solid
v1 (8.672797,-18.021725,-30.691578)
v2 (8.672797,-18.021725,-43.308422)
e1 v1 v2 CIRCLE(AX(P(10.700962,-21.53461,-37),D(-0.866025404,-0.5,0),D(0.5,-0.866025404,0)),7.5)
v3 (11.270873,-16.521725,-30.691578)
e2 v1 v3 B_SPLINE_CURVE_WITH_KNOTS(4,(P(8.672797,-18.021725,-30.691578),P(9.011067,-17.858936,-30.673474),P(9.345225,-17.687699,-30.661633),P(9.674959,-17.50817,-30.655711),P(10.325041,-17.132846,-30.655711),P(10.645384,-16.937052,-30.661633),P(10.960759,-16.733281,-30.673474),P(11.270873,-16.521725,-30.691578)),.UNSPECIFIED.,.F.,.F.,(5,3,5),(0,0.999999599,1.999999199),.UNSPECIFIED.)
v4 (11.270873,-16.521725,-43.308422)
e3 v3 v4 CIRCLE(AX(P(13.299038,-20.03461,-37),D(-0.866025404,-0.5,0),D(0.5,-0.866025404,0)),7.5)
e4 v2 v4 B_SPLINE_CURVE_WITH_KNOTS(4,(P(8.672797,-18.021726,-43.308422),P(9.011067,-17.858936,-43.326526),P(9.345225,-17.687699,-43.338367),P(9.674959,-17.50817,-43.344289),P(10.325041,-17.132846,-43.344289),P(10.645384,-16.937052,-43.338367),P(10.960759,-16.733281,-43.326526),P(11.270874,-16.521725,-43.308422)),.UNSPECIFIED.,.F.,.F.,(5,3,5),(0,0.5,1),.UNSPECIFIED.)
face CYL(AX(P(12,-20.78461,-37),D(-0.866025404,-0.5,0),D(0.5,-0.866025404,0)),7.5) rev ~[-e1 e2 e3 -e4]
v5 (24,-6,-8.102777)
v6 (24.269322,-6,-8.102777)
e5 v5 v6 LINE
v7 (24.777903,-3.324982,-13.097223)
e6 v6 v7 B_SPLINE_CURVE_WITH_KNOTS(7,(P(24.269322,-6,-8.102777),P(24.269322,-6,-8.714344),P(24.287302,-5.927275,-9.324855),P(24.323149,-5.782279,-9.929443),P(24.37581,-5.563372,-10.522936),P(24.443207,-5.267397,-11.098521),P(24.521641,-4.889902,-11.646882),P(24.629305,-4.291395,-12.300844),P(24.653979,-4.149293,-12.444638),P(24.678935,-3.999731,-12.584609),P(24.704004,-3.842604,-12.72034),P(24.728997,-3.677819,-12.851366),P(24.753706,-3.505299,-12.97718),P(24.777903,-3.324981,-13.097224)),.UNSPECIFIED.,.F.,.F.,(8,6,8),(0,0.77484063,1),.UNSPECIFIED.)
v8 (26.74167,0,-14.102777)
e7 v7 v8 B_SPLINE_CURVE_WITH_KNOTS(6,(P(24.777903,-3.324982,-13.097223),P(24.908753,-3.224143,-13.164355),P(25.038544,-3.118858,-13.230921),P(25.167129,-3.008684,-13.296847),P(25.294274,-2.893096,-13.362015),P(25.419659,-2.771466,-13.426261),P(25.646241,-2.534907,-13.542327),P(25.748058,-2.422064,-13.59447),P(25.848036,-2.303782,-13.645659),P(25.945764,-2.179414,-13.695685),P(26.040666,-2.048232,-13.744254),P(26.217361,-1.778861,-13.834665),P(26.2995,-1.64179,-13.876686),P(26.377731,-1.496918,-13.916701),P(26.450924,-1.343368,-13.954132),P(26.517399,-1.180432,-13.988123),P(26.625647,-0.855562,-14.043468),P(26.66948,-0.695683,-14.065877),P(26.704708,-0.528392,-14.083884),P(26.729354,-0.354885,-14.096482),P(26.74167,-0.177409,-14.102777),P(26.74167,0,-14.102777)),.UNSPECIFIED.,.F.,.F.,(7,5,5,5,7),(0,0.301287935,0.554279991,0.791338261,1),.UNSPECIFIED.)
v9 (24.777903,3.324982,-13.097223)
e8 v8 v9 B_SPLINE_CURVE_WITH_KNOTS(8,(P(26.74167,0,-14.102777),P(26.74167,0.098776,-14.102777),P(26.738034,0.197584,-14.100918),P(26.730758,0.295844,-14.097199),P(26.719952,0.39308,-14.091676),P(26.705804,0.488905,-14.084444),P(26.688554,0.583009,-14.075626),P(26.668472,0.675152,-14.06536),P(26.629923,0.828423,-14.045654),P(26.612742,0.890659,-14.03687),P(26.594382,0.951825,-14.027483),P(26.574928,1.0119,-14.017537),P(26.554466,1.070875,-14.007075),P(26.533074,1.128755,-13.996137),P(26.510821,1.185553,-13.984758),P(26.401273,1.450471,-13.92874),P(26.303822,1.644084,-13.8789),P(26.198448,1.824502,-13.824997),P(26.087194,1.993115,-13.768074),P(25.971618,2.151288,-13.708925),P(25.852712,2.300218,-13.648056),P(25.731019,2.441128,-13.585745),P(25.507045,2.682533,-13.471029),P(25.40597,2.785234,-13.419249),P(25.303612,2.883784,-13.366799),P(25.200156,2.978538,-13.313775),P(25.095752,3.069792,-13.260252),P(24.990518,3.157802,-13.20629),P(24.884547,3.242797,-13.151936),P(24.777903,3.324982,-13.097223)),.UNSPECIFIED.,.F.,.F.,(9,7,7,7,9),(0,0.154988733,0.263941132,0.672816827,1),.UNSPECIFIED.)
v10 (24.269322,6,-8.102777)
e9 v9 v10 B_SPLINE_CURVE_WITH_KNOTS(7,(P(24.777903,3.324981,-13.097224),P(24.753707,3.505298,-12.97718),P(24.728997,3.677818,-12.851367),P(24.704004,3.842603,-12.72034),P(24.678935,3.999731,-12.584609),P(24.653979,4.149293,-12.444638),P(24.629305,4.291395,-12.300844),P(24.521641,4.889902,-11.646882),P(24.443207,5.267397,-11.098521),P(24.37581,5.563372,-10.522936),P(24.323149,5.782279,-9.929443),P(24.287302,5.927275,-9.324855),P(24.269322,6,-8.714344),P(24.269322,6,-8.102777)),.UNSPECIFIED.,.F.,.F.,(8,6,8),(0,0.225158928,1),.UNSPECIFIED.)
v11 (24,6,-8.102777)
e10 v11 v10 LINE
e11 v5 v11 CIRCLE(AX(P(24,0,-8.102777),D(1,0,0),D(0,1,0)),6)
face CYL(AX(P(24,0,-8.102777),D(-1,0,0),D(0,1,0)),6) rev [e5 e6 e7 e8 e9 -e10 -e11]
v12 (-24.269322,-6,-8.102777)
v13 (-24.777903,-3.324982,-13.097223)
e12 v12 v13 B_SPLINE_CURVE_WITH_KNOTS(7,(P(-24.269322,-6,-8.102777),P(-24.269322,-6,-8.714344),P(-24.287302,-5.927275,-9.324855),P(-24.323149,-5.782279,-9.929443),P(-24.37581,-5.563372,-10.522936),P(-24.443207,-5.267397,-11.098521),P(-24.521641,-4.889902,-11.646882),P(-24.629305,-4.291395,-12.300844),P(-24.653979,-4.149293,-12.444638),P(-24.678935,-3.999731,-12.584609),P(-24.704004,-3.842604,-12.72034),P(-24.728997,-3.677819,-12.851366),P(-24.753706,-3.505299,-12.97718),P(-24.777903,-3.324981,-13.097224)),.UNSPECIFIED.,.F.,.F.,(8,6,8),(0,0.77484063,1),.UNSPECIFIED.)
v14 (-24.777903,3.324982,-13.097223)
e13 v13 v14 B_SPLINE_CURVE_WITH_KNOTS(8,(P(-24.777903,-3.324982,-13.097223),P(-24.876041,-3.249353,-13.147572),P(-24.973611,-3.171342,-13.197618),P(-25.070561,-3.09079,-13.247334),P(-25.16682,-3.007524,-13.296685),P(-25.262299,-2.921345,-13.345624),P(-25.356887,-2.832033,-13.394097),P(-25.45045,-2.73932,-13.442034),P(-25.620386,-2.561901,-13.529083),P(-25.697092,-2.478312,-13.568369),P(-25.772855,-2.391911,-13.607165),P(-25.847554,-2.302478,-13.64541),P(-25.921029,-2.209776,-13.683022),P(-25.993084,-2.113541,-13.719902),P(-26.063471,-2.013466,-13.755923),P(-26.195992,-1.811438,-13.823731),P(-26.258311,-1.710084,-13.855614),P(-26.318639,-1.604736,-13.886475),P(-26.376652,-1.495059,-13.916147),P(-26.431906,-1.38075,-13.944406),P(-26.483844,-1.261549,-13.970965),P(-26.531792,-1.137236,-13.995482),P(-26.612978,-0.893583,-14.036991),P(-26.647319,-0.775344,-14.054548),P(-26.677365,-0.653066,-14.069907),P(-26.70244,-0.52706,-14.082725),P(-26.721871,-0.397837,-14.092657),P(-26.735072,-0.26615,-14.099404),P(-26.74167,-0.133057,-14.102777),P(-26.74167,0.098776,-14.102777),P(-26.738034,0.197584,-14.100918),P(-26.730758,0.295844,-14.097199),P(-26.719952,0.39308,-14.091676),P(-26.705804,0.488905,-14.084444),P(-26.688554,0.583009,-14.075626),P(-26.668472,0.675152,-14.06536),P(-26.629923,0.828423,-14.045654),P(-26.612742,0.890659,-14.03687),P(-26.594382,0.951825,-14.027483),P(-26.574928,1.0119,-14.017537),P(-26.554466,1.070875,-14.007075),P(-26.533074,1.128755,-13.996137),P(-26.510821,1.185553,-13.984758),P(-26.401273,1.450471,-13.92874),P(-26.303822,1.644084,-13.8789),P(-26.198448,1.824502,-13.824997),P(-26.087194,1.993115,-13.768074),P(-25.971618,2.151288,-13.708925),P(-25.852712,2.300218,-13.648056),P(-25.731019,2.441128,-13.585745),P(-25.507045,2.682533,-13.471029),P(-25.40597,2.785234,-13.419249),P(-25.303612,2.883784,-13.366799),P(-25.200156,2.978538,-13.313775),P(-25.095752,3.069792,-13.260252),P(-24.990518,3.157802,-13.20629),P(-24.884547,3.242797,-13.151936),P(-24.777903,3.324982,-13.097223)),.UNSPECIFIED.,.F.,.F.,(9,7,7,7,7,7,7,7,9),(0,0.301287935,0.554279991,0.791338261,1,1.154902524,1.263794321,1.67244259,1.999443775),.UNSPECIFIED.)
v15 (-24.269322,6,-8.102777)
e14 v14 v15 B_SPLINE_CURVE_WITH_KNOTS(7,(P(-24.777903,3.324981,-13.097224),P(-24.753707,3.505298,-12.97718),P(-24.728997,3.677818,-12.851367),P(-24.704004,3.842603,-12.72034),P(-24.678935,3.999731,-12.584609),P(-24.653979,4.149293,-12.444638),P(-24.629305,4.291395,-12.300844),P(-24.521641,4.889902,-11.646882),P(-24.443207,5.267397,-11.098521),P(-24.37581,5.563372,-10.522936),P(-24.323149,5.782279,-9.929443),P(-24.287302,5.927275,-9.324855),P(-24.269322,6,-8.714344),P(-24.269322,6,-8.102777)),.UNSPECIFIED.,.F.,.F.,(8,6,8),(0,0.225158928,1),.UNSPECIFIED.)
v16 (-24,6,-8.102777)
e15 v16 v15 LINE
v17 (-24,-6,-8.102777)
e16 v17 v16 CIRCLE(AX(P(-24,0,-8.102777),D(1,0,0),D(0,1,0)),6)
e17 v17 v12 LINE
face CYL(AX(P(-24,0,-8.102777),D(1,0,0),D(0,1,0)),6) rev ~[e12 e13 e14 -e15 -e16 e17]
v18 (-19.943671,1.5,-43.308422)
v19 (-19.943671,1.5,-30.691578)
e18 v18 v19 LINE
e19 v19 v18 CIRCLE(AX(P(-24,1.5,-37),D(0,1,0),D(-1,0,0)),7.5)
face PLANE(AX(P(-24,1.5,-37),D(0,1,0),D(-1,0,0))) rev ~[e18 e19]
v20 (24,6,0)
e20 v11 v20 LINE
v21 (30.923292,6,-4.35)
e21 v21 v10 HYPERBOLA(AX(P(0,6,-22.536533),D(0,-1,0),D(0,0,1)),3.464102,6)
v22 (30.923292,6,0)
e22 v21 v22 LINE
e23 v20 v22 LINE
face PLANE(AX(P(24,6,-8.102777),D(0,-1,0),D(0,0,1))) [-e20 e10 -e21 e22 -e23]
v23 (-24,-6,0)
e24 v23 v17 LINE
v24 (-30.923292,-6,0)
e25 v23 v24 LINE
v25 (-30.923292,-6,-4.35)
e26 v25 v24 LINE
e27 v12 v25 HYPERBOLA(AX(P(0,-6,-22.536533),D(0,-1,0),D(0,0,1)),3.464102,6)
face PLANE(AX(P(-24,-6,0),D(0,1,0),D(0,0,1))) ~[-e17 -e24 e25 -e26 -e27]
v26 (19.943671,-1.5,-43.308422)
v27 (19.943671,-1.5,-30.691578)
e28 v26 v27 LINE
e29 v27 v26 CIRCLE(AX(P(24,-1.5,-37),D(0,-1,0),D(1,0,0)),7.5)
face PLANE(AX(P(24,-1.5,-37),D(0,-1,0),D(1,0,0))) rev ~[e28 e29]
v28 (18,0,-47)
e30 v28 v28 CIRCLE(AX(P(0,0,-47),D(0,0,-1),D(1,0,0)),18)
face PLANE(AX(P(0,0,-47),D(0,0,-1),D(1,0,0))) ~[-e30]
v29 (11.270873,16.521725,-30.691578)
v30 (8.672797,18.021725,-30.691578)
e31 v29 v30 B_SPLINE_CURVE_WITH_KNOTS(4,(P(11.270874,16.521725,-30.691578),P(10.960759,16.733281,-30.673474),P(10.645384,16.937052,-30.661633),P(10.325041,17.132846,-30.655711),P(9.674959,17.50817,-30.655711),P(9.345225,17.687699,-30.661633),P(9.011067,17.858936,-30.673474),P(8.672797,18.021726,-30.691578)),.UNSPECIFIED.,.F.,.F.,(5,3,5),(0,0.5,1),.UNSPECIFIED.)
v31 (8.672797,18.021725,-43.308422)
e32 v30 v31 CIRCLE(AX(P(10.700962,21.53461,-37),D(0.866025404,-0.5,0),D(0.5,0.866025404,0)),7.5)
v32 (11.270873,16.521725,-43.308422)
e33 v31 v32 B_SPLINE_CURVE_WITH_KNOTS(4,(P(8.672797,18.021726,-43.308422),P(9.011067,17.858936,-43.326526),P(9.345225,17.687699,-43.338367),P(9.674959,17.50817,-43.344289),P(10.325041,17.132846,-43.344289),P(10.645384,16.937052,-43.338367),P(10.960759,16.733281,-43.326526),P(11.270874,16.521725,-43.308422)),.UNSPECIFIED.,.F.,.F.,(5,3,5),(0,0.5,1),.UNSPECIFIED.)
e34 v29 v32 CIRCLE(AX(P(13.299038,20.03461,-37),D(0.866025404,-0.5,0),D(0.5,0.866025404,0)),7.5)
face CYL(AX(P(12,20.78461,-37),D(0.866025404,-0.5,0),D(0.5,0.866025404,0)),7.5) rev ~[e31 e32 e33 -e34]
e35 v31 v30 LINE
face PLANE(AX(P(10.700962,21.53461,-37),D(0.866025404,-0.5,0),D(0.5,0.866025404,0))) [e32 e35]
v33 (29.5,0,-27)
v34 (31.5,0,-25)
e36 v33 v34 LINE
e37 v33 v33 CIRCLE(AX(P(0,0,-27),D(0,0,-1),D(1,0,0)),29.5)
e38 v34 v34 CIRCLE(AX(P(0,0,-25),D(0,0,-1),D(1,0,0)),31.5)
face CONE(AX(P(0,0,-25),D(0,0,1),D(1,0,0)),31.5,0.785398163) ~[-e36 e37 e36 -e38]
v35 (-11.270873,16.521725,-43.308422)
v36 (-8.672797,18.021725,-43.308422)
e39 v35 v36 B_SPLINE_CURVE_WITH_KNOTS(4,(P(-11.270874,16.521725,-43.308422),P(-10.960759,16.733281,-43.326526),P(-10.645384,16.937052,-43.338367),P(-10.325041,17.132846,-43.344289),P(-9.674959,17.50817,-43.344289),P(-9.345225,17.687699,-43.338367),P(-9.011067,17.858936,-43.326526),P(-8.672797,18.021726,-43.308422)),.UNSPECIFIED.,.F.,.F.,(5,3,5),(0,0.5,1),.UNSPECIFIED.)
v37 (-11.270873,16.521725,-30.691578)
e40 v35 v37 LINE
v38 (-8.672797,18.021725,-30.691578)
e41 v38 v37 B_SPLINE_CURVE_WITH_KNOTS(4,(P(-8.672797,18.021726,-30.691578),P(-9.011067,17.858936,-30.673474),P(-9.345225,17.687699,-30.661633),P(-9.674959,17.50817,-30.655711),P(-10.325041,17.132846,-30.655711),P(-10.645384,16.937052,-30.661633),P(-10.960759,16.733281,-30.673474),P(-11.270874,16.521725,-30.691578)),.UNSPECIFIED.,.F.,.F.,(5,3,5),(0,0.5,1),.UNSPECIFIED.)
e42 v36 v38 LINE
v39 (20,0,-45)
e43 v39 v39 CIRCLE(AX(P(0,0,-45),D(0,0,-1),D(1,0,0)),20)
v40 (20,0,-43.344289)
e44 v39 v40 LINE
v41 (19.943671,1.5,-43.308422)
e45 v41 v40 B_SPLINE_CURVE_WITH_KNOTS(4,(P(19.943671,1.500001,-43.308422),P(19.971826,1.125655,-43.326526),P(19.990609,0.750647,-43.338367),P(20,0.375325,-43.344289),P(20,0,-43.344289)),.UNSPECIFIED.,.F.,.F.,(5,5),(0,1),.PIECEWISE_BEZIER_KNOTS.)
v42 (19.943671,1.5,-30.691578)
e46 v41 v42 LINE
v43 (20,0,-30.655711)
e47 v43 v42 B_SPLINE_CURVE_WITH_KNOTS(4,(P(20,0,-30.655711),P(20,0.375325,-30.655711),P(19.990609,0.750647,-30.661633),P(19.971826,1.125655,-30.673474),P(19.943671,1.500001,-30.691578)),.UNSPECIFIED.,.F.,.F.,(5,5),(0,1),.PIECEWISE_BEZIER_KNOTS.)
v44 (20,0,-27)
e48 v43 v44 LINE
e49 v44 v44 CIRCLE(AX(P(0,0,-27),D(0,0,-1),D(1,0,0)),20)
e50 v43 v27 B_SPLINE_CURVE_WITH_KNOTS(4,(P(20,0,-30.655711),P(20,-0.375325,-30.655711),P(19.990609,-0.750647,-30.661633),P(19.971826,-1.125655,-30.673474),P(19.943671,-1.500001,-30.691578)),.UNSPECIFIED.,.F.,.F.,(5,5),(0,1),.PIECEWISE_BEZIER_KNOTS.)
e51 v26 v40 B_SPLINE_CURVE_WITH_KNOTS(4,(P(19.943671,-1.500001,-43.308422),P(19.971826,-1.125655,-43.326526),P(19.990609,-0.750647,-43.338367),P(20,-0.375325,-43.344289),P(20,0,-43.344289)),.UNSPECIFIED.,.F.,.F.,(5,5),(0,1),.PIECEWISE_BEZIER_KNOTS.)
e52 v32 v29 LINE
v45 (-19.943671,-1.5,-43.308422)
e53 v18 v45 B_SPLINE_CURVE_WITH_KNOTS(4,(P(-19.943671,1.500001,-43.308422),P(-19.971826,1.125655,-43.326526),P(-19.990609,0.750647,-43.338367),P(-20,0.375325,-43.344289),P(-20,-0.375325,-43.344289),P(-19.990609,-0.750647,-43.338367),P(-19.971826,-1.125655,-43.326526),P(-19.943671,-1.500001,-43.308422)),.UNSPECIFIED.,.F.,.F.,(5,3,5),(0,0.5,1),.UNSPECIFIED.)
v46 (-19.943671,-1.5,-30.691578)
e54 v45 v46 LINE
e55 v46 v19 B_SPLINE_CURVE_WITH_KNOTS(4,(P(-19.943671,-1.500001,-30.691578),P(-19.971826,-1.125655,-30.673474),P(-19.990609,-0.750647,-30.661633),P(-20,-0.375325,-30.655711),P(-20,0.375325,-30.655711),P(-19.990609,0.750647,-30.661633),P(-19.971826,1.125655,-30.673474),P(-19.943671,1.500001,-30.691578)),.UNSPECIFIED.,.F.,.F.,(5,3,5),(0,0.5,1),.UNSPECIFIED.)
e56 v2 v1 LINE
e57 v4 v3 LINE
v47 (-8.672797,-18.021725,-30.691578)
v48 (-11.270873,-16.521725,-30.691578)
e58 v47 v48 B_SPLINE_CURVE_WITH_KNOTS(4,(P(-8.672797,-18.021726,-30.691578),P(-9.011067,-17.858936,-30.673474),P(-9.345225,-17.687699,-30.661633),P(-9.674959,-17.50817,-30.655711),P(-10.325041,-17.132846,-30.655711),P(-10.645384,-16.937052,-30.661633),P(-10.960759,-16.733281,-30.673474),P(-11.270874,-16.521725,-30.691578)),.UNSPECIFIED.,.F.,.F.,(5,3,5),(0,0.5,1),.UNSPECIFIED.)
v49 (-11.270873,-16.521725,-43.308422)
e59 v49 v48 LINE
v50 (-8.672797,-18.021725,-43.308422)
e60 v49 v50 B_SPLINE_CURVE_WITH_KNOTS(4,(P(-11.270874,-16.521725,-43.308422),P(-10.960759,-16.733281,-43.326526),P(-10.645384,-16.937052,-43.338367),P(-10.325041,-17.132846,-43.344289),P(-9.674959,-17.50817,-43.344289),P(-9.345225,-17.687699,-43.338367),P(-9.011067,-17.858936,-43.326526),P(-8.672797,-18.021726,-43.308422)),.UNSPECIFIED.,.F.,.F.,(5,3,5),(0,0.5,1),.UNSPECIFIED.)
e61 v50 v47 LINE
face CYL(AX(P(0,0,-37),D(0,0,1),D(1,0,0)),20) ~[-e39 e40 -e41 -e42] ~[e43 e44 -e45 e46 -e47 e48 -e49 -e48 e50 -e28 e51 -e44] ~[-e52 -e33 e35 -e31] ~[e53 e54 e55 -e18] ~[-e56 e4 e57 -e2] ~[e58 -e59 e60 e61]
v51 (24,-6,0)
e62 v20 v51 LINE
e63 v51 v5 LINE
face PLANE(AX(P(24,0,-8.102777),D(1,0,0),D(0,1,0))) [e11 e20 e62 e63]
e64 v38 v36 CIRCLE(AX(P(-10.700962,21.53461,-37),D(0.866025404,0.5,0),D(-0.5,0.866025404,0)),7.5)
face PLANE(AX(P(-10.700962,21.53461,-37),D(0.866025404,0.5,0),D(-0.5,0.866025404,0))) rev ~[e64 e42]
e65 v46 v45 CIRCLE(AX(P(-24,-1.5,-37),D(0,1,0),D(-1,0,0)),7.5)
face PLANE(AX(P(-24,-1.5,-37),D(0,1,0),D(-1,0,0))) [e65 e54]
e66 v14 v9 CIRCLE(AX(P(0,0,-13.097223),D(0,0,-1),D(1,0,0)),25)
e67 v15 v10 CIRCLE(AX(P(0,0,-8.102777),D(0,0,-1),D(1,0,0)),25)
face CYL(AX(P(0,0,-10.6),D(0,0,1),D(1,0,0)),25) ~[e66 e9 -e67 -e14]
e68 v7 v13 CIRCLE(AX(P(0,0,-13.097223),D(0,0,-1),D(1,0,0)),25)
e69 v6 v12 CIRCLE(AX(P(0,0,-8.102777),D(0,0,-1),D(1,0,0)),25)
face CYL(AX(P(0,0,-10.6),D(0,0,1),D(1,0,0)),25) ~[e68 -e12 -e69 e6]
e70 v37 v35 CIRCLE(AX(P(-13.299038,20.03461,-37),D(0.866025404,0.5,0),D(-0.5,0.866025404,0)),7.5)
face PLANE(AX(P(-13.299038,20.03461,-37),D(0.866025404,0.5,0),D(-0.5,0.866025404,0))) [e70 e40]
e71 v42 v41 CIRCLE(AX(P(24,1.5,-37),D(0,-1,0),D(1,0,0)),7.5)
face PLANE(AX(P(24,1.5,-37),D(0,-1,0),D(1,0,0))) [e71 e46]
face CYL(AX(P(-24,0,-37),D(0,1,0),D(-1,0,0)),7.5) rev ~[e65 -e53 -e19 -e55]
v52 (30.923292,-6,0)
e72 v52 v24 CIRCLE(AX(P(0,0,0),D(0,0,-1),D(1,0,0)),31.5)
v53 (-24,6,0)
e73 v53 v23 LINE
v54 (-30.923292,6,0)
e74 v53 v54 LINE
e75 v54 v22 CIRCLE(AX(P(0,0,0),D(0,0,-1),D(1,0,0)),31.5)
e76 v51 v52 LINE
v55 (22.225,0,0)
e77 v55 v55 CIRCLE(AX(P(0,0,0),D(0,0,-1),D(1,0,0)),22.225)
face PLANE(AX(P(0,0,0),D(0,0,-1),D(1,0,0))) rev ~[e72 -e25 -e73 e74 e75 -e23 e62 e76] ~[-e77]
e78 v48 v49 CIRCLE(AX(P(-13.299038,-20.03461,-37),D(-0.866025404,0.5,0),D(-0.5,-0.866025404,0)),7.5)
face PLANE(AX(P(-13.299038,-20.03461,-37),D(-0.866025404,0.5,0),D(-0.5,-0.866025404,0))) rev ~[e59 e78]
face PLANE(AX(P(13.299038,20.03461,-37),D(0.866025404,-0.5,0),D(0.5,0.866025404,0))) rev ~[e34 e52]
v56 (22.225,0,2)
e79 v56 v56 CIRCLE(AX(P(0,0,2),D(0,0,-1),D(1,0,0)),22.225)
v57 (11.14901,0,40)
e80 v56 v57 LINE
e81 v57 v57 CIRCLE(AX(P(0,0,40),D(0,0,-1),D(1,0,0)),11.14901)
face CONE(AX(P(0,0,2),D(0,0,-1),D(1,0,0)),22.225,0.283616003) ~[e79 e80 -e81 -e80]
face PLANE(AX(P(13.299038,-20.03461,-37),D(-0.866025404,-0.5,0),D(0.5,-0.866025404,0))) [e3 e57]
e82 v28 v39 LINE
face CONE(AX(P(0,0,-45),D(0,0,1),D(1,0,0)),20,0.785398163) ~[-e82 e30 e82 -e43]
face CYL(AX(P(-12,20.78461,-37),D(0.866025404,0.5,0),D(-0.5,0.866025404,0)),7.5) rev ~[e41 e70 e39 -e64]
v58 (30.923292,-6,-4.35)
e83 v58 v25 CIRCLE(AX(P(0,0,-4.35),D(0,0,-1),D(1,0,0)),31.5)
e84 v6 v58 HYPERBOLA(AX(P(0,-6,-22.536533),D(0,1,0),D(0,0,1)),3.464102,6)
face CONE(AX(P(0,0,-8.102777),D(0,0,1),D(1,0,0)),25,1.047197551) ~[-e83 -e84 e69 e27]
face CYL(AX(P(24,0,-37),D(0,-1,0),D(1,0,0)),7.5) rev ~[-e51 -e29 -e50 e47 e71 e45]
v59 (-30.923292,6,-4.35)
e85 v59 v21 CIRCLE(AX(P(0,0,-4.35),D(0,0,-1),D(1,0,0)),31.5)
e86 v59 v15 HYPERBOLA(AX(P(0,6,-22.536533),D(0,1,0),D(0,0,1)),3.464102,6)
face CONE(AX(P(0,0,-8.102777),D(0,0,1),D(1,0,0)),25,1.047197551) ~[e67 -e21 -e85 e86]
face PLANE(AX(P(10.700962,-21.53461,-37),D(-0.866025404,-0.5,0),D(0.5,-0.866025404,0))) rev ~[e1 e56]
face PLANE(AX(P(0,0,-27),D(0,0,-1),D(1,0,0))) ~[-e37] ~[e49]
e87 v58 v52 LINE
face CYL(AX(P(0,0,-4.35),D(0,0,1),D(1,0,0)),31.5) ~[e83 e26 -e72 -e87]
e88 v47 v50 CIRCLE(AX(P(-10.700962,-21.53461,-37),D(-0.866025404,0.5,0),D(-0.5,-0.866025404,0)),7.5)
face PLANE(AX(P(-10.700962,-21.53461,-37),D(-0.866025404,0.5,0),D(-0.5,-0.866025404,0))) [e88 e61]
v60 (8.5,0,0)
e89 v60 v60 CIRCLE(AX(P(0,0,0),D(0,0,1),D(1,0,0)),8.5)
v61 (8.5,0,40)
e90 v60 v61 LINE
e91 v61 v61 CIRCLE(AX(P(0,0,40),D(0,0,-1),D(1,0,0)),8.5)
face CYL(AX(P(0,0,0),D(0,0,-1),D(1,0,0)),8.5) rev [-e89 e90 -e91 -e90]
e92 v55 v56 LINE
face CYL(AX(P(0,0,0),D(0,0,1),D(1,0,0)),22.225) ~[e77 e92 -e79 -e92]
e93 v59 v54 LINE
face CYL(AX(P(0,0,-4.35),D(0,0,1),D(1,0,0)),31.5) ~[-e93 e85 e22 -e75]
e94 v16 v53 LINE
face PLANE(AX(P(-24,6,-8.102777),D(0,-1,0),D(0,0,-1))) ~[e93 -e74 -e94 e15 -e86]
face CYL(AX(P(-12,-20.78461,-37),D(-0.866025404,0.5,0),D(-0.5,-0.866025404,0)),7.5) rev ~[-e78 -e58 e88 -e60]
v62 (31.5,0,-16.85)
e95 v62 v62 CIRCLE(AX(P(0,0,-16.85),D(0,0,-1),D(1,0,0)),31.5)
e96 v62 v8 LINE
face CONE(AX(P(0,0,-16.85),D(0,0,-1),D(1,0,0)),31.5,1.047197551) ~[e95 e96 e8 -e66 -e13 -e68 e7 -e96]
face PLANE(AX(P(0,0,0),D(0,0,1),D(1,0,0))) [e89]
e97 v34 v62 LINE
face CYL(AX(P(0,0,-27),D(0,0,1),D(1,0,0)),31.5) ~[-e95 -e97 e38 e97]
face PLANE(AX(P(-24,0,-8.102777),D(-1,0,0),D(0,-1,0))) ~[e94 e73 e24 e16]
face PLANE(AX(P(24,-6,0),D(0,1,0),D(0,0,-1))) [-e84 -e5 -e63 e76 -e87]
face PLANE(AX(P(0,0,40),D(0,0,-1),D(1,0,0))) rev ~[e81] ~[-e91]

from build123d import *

# Parameters (mm, degrees)
F0_W            = 25
F0_H            = 4.9944465005
F0_W_2          = 20
F0_H_2          = 20
F2_SIZE         = 2
F5_DEPTH        = 63.5294467211
F7_R            = 7.5
F8_DEPTH        = 1.5
F8_COPIES_COUNT = 6
F9_R            = 8.5
F10_DEPTH       = 89.8396968842


# Not quite as in the source:
# - a pattern or mirror of a feature is missing from the dataset's text; its kind, count and spacing are read off the source's solid


with BuildPart() as f1:
    # F0 (on Front) → F1 (revolve)
    with BuildSketch(Plane.XZ):
        Polygon((0, 40), (0, 0), (22.225, 0), (22.225, 2), (11.1490100557, 40), align=None)
        Polygon((22.225, 0), (0, 0), (0, -4.35), (31.5, -4.35), (31.5, 0), align=None)
        Polygon((31.5, -4.35), (0, -4.35), (0, -8.1027767497), (25, -8.1027767497), align=None)
        with Locations((12.5, -10.6)):
            Rectangle(F0_W, F0_H)
        Polygon((25, -13.0972232503), (0, -13.0972232503), (0, -16.85), (31.5, -16.85), align=None)
        Polygon((31.5, -16.85), (0, -16.85), (0, -27), (20, -27), (31.5, -27), align=None)
        with Locations((10, -37)):
            Rectangle(F0_W_2, F0_H_2)
    revolve(axis=Axis((0, 0, -0.6091467625), (0, 0, -1)))

    # F2
    f2_edges = [f1.edges().sort_by_distance(p)[0] for p in [
        (-31.5, 0, -27),
        (-20, 0, -47),
    ]]
    chamfer(f2_edges, length=F2_SIZE)

    # F4 (on offset) → F5 (cut)
    with BuildSketch(Plane.YZ.offset(24)):
        with BuildLine():
            ThreePointArc((-6, -8.1027767497), (0, -14.1027767497), (6, -8.1027767497))
            ThreePointArc((6, -8.1027767497), (0, -2.1027767497), (-6, -8.1027767497))
        make_face()
        with BuildLine():
            ThreePointArc((-6, -8.1027767497), (0, -2.1027767497), (6, -8.1027767497))
            Line((6, -8.1027767497), (6, 0))
            Line((6, 0), (-6, 0))
            Line((-6, 0), (-6, -8.1027767497))
        make_face()
    extrude(amount=F5_DEPTH, mode=Mode.SUBTRACT)

    # F6: F1 across plane


with BuildPart() as f1_1:
    add(f1.part)
    add(f1.part.mirror(Plane.YZ), mode=Mode.INTERSECT)

    # F7 (on Front) → F8 (cut, symmetric)
    with BuildSketch(Plane.XZ):
        with Locations((24, -37)):
            Circle(F7_R)
    f8 = extrude(amount=F8_DEPTH, both=True, mode=Mode.SUBTRACT)

    # F8_copies: F8 ×6 about axis
    f8_copies_axis = Axis((0, 0, 0), (0, 0, 1))
    for i in range(1, F8_COPIES_COUNT):
        add(f8.rotate(f8_copies_axis, i * 360 / F8_COPIES_COUNT), mode=Mode.SUBTRACT)

    # F9 (on Top) → F10 (cut)
    with BuildSketch(Plane.XY):
        Circle(F9_R)
    extrude(amount=F10_DEPTH, mode=Mode.SUBTRACT)


solid = f1_1.part
